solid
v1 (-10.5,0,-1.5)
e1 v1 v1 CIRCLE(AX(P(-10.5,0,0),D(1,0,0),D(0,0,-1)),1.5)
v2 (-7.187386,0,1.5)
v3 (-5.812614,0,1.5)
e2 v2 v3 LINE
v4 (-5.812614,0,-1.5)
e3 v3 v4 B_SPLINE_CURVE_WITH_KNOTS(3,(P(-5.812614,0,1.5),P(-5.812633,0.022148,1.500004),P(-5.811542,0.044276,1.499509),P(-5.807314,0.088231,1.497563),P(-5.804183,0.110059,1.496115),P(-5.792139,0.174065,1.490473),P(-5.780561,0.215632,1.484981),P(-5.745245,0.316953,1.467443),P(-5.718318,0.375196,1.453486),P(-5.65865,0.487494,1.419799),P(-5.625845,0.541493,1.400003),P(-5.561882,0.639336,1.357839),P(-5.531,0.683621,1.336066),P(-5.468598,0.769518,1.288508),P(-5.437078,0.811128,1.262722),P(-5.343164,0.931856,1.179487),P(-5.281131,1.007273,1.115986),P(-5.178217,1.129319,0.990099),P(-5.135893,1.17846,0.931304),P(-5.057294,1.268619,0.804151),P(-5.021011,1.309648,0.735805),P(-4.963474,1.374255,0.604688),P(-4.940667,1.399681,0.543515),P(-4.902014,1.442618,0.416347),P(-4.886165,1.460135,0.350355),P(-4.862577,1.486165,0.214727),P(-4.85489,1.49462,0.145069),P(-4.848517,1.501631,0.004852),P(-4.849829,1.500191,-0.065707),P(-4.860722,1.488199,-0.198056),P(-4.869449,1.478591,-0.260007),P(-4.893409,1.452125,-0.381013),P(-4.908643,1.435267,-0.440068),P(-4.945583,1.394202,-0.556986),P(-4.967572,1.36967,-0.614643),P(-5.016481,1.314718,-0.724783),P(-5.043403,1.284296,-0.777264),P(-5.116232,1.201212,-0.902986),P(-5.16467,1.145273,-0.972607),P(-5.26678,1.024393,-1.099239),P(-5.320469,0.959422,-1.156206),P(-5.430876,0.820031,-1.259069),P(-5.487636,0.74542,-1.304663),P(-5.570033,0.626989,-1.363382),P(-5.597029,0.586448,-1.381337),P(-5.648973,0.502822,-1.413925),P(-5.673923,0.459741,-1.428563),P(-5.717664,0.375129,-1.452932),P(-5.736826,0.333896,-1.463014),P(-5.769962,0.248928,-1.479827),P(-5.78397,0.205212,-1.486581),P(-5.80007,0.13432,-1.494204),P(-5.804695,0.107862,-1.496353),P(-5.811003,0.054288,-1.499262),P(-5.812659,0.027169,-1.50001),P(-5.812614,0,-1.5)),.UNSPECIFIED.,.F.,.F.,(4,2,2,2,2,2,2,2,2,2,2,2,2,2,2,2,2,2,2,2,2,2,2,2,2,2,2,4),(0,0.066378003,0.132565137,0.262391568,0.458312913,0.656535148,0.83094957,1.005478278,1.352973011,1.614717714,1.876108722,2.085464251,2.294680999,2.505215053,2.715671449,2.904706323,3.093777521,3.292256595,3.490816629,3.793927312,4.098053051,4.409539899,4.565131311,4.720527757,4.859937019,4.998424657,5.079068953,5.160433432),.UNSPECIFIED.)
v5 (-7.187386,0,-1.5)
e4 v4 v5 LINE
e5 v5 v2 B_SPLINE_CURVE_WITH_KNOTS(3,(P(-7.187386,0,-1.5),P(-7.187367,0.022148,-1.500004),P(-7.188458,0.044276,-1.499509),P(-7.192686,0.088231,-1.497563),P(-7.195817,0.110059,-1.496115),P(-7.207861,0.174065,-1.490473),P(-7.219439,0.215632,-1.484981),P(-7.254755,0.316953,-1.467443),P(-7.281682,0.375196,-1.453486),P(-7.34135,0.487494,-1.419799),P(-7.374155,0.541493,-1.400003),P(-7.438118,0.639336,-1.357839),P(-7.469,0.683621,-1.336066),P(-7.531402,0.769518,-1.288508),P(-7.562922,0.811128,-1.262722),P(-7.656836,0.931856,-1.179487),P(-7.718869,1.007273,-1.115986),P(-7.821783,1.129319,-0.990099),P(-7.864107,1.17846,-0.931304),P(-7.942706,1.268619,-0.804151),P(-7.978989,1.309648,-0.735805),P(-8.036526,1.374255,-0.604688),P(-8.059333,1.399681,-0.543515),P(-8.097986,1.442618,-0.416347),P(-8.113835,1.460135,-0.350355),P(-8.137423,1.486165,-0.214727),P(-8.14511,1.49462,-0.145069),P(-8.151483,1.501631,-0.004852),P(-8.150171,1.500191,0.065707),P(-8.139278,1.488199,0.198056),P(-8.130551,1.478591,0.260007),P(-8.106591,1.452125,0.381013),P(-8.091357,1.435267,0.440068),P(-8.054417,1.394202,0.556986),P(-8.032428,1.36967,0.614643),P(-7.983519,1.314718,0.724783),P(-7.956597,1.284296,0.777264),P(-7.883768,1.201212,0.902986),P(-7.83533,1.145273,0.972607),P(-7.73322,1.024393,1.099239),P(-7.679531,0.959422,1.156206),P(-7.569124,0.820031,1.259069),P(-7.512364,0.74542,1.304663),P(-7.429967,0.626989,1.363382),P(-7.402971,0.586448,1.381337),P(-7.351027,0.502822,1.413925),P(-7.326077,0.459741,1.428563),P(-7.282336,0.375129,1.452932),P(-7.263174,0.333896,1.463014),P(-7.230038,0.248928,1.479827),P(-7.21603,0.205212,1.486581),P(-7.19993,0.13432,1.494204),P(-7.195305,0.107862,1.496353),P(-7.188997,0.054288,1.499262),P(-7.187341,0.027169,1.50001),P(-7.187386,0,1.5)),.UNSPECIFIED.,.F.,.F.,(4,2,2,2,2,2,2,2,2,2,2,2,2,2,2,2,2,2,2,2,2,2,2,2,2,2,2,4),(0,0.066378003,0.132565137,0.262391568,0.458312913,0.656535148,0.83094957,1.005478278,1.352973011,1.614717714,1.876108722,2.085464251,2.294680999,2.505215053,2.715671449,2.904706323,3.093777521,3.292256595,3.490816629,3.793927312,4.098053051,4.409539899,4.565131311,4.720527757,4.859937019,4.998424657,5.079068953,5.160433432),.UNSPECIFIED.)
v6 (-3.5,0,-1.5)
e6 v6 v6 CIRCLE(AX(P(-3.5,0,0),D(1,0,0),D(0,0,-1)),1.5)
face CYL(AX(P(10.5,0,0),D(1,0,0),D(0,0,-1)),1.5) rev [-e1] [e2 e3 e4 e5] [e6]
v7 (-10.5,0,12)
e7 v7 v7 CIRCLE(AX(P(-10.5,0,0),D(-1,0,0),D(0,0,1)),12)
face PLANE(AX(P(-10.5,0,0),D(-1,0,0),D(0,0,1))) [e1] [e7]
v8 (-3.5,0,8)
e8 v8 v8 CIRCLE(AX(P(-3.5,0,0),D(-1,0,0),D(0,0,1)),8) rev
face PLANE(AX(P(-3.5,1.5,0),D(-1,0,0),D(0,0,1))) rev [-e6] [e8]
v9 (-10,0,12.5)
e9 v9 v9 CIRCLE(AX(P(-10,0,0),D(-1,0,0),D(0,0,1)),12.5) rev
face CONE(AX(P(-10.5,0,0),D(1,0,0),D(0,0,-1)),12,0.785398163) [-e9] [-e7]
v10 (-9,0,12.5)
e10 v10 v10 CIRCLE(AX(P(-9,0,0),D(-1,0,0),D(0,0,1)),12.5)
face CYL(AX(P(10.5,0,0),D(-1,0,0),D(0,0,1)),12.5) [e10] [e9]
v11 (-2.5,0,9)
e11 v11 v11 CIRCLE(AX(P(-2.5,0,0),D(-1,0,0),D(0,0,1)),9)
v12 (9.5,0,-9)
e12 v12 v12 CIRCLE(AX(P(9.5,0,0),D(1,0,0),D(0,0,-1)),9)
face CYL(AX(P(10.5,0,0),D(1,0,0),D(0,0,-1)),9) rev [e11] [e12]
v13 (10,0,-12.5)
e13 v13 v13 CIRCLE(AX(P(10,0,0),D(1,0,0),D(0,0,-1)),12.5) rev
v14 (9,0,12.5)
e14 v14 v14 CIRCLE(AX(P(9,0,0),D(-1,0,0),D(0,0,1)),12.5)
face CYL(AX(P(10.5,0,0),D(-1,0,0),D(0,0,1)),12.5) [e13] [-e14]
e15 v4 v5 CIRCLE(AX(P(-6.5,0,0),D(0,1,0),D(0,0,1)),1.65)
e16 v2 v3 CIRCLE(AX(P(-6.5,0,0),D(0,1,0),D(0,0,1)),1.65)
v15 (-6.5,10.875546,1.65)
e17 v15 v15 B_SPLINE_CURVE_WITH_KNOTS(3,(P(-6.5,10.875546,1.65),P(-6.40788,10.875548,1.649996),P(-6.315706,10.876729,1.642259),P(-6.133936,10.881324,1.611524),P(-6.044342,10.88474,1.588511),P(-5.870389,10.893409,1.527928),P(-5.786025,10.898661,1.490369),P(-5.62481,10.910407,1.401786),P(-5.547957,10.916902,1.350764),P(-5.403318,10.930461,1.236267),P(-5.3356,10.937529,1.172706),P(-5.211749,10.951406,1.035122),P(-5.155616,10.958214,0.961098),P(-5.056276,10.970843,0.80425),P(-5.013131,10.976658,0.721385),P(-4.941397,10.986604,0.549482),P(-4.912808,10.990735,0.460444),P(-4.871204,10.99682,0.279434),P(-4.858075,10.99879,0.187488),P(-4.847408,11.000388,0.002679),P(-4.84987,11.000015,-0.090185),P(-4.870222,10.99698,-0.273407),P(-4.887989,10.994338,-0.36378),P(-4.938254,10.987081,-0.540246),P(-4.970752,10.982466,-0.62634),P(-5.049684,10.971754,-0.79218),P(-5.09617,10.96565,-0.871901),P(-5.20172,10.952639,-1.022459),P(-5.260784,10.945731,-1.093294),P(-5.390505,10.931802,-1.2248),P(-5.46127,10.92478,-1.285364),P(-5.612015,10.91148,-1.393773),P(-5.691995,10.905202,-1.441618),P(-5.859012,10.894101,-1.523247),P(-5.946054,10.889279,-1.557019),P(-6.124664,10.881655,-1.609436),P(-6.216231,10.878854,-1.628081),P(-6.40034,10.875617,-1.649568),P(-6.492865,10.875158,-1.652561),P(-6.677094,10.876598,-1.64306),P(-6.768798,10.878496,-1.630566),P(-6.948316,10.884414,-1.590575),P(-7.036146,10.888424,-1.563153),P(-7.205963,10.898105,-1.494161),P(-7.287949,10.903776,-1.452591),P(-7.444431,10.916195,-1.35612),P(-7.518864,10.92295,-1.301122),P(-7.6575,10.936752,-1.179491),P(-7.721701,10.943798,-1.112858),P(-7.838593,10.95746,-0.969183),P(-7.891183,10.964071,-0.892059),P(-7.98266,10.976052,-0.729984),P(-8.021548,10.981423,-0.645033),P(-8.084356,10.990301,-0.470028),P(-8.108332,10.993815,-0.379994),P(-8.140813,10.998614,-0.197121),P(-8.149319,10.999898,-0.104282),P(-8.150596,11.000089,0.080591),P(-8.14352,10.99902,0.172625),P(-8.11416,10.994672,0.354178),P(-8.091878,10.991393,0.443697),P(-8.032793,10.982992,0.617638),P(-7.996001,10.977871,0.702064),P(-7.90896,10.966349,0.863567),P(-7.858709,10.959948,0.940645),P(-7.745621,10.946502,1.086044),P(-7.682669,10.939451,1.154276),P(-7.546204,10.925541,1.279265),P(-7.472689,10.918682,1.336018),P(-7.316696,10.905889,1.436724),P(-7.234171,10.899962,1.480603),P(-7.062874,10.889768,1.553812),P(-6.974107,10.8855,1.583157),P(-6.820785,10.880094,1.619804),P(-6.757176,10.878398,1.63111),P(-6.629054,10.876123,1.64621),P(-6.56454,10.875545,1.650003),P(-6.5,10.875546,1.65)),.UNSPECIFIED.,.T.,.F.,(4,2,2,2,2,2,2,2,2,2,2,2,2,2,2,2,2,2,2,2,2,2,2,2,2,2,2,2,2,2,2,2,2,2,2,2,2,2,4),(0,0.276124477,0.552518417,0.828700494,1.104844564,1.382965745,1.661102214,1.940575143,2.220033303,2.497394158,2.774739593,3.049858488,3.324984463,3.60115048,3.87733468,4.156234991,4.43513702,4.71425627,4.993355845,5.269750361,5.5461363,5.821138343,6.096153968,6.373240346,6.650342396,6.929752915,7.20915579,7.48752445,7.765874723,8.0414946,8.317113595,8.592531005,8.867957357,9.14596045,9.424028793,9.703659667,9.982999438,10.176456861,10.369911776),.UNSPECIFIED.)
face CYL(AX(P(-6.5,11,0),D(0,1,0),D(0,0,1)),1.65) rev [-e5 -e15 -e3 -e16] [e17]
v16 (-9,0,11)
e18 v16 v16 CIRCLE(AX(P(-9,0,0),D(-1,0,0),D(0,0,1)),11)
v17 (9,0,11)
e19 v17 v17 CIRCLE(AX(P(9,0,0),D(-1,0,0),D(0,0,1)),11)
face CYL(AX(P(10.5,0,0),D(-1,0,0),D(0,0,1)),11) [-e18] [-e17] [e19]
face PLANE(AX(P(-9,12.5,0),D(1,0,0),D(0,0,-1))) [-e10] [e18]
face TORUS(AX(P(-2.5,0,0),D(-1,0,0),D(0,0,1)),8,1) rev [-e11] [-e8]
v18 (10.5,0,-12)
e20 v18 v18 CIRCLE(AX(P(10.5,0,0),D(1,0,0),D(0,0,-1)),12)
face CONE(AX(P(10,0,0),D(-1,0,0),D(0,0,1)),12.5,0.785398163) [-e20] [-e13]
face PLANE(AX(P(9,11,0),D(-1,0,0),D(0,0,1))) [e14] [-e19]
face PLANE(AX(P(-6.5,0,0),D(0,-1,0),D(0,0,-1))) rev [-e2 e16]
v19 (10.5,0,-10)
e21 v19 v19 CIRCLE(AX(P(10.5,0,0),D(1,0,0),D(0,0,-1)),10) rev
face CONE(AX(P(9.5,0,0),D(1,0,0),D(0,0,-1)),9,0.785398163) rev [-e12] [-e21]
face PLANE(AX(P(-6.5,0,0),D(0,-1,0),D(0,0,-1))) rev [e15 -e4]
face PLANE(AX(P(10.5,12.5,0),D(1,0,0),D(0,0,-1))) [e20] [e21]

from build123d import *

# Parameters (mm, degrees)
REBAIXO_PARA_PARAFUSO_DE_M_QUINA_DE_CABE_D           = 3
REBAIXO_PARA_PARAFUSO_DE_M_QUINA_DE_CABE_CBORE_D     = 18
REBAIXO_PARA_PARAFUSO_DE_M_QUINA_DE_CABE_CBORE_DEPTH = 14
FURO_DE_DI_METRO_3_3_3_3_1_OUTLINE_R                 = 1.65
FURO_DE_DI_METRO_3_3_3_3_1_DEPTH                     = 11.000000058
CHANFRO1_SIZE                                        = 0.5
CHANFRO2_SIZE                                        = 1
FILETE1_R                                            = 1


# Read off the part's stored shape, not the designer's step: Furo de diâmetro Ø3.3 (3.3)1
with BuildPart() as part:
    # Esboço1 → Revolução1 (revolve)
    with BuildSketch(Plane(origin=(0, 0, 0), x_dir=(-1, 0, 0), z_dir=(0, 0, -1)), mode=Mode.PRIVATE) as revolu_o1_sk:
        Polygon((-10.5, 12.5), (-10.5, 0), (10.5, 0), (10.5, 12.5), (9, 12.5), (9, 11), (-9, 11), (-9, 12.5), align=None)
    revolve(revolu_o1_sk.sketch.rotate(Axis((10.5, 0, 0), (-1, 0, 0)), 270), axis=Axis((10.5, 0, 0), (-1, 0, 0)))

    # Rebaixo para parafuso de máquina de cabeça sextavada de M2.51 (through all)
    with Locations(Plane(origin=(10.5, 0, 0), x_dir=(0, 0, -1), z_dir=(1, 0, 0))):
        with Locations((0, 0)):
            CounterBoreHole(REBAIXO_PARA_PARAFUSO_DE_M_QUINA_DE_CABE_D / 2, REBAIXO_PARA_PARAFUSO_DE_M_QUINA_DE_CABE_CBORE_D / 2, REBAIXO_PARA_PARAFUSO_DE_M_QUINA_DE_CABE_CBORE_DEPTH)

    # Furo de diâmetro Ø3.3 (3.3)1 outline → Furo de diâmetro Ø3.3 (3.3)1 (cut)
    with BuildSketch(Plane(origin=(0, 0, 0), x_dir=(1, 0, 0), z_dir=(0, 1, 0))):
        with Locations((-6.5, 0)):
            Circle(FURO_DE_DI_METRO_3_3_3_3_1_OUTLINE_R)
    extrude(amount=FURO_DE_DI_METRO_3_3_3_3_1_DEPTH, mode=Mode.SUBTRACT)

    # Chanfro1
    chanfro1_edges = [part.edges().sort_by_distance(p)[0] for p in [
        (10.5, 0, -12.5),
        (-10.5, 0, -12.5),
    ]]
    chamfer(chanfro1_edges, length=CHANFRO1_SIZE)

    # Chanfro2
    chanfro2_edges = [part.edges().sort_by_distance(p)[0] for p in [
        (10.5, 0, 9),
    ]]
    chamfer(chanfro2_edges, length=CHANFRO2_SIZE)

    # Filete1
    filete1_edges = [part.edges().sort_by_distance(p)[0] for p in [
        (-3.5, 0, 9),
    ]]
    fillet(filete1_edges, radius=FILETE1_R)


solid = part.part
